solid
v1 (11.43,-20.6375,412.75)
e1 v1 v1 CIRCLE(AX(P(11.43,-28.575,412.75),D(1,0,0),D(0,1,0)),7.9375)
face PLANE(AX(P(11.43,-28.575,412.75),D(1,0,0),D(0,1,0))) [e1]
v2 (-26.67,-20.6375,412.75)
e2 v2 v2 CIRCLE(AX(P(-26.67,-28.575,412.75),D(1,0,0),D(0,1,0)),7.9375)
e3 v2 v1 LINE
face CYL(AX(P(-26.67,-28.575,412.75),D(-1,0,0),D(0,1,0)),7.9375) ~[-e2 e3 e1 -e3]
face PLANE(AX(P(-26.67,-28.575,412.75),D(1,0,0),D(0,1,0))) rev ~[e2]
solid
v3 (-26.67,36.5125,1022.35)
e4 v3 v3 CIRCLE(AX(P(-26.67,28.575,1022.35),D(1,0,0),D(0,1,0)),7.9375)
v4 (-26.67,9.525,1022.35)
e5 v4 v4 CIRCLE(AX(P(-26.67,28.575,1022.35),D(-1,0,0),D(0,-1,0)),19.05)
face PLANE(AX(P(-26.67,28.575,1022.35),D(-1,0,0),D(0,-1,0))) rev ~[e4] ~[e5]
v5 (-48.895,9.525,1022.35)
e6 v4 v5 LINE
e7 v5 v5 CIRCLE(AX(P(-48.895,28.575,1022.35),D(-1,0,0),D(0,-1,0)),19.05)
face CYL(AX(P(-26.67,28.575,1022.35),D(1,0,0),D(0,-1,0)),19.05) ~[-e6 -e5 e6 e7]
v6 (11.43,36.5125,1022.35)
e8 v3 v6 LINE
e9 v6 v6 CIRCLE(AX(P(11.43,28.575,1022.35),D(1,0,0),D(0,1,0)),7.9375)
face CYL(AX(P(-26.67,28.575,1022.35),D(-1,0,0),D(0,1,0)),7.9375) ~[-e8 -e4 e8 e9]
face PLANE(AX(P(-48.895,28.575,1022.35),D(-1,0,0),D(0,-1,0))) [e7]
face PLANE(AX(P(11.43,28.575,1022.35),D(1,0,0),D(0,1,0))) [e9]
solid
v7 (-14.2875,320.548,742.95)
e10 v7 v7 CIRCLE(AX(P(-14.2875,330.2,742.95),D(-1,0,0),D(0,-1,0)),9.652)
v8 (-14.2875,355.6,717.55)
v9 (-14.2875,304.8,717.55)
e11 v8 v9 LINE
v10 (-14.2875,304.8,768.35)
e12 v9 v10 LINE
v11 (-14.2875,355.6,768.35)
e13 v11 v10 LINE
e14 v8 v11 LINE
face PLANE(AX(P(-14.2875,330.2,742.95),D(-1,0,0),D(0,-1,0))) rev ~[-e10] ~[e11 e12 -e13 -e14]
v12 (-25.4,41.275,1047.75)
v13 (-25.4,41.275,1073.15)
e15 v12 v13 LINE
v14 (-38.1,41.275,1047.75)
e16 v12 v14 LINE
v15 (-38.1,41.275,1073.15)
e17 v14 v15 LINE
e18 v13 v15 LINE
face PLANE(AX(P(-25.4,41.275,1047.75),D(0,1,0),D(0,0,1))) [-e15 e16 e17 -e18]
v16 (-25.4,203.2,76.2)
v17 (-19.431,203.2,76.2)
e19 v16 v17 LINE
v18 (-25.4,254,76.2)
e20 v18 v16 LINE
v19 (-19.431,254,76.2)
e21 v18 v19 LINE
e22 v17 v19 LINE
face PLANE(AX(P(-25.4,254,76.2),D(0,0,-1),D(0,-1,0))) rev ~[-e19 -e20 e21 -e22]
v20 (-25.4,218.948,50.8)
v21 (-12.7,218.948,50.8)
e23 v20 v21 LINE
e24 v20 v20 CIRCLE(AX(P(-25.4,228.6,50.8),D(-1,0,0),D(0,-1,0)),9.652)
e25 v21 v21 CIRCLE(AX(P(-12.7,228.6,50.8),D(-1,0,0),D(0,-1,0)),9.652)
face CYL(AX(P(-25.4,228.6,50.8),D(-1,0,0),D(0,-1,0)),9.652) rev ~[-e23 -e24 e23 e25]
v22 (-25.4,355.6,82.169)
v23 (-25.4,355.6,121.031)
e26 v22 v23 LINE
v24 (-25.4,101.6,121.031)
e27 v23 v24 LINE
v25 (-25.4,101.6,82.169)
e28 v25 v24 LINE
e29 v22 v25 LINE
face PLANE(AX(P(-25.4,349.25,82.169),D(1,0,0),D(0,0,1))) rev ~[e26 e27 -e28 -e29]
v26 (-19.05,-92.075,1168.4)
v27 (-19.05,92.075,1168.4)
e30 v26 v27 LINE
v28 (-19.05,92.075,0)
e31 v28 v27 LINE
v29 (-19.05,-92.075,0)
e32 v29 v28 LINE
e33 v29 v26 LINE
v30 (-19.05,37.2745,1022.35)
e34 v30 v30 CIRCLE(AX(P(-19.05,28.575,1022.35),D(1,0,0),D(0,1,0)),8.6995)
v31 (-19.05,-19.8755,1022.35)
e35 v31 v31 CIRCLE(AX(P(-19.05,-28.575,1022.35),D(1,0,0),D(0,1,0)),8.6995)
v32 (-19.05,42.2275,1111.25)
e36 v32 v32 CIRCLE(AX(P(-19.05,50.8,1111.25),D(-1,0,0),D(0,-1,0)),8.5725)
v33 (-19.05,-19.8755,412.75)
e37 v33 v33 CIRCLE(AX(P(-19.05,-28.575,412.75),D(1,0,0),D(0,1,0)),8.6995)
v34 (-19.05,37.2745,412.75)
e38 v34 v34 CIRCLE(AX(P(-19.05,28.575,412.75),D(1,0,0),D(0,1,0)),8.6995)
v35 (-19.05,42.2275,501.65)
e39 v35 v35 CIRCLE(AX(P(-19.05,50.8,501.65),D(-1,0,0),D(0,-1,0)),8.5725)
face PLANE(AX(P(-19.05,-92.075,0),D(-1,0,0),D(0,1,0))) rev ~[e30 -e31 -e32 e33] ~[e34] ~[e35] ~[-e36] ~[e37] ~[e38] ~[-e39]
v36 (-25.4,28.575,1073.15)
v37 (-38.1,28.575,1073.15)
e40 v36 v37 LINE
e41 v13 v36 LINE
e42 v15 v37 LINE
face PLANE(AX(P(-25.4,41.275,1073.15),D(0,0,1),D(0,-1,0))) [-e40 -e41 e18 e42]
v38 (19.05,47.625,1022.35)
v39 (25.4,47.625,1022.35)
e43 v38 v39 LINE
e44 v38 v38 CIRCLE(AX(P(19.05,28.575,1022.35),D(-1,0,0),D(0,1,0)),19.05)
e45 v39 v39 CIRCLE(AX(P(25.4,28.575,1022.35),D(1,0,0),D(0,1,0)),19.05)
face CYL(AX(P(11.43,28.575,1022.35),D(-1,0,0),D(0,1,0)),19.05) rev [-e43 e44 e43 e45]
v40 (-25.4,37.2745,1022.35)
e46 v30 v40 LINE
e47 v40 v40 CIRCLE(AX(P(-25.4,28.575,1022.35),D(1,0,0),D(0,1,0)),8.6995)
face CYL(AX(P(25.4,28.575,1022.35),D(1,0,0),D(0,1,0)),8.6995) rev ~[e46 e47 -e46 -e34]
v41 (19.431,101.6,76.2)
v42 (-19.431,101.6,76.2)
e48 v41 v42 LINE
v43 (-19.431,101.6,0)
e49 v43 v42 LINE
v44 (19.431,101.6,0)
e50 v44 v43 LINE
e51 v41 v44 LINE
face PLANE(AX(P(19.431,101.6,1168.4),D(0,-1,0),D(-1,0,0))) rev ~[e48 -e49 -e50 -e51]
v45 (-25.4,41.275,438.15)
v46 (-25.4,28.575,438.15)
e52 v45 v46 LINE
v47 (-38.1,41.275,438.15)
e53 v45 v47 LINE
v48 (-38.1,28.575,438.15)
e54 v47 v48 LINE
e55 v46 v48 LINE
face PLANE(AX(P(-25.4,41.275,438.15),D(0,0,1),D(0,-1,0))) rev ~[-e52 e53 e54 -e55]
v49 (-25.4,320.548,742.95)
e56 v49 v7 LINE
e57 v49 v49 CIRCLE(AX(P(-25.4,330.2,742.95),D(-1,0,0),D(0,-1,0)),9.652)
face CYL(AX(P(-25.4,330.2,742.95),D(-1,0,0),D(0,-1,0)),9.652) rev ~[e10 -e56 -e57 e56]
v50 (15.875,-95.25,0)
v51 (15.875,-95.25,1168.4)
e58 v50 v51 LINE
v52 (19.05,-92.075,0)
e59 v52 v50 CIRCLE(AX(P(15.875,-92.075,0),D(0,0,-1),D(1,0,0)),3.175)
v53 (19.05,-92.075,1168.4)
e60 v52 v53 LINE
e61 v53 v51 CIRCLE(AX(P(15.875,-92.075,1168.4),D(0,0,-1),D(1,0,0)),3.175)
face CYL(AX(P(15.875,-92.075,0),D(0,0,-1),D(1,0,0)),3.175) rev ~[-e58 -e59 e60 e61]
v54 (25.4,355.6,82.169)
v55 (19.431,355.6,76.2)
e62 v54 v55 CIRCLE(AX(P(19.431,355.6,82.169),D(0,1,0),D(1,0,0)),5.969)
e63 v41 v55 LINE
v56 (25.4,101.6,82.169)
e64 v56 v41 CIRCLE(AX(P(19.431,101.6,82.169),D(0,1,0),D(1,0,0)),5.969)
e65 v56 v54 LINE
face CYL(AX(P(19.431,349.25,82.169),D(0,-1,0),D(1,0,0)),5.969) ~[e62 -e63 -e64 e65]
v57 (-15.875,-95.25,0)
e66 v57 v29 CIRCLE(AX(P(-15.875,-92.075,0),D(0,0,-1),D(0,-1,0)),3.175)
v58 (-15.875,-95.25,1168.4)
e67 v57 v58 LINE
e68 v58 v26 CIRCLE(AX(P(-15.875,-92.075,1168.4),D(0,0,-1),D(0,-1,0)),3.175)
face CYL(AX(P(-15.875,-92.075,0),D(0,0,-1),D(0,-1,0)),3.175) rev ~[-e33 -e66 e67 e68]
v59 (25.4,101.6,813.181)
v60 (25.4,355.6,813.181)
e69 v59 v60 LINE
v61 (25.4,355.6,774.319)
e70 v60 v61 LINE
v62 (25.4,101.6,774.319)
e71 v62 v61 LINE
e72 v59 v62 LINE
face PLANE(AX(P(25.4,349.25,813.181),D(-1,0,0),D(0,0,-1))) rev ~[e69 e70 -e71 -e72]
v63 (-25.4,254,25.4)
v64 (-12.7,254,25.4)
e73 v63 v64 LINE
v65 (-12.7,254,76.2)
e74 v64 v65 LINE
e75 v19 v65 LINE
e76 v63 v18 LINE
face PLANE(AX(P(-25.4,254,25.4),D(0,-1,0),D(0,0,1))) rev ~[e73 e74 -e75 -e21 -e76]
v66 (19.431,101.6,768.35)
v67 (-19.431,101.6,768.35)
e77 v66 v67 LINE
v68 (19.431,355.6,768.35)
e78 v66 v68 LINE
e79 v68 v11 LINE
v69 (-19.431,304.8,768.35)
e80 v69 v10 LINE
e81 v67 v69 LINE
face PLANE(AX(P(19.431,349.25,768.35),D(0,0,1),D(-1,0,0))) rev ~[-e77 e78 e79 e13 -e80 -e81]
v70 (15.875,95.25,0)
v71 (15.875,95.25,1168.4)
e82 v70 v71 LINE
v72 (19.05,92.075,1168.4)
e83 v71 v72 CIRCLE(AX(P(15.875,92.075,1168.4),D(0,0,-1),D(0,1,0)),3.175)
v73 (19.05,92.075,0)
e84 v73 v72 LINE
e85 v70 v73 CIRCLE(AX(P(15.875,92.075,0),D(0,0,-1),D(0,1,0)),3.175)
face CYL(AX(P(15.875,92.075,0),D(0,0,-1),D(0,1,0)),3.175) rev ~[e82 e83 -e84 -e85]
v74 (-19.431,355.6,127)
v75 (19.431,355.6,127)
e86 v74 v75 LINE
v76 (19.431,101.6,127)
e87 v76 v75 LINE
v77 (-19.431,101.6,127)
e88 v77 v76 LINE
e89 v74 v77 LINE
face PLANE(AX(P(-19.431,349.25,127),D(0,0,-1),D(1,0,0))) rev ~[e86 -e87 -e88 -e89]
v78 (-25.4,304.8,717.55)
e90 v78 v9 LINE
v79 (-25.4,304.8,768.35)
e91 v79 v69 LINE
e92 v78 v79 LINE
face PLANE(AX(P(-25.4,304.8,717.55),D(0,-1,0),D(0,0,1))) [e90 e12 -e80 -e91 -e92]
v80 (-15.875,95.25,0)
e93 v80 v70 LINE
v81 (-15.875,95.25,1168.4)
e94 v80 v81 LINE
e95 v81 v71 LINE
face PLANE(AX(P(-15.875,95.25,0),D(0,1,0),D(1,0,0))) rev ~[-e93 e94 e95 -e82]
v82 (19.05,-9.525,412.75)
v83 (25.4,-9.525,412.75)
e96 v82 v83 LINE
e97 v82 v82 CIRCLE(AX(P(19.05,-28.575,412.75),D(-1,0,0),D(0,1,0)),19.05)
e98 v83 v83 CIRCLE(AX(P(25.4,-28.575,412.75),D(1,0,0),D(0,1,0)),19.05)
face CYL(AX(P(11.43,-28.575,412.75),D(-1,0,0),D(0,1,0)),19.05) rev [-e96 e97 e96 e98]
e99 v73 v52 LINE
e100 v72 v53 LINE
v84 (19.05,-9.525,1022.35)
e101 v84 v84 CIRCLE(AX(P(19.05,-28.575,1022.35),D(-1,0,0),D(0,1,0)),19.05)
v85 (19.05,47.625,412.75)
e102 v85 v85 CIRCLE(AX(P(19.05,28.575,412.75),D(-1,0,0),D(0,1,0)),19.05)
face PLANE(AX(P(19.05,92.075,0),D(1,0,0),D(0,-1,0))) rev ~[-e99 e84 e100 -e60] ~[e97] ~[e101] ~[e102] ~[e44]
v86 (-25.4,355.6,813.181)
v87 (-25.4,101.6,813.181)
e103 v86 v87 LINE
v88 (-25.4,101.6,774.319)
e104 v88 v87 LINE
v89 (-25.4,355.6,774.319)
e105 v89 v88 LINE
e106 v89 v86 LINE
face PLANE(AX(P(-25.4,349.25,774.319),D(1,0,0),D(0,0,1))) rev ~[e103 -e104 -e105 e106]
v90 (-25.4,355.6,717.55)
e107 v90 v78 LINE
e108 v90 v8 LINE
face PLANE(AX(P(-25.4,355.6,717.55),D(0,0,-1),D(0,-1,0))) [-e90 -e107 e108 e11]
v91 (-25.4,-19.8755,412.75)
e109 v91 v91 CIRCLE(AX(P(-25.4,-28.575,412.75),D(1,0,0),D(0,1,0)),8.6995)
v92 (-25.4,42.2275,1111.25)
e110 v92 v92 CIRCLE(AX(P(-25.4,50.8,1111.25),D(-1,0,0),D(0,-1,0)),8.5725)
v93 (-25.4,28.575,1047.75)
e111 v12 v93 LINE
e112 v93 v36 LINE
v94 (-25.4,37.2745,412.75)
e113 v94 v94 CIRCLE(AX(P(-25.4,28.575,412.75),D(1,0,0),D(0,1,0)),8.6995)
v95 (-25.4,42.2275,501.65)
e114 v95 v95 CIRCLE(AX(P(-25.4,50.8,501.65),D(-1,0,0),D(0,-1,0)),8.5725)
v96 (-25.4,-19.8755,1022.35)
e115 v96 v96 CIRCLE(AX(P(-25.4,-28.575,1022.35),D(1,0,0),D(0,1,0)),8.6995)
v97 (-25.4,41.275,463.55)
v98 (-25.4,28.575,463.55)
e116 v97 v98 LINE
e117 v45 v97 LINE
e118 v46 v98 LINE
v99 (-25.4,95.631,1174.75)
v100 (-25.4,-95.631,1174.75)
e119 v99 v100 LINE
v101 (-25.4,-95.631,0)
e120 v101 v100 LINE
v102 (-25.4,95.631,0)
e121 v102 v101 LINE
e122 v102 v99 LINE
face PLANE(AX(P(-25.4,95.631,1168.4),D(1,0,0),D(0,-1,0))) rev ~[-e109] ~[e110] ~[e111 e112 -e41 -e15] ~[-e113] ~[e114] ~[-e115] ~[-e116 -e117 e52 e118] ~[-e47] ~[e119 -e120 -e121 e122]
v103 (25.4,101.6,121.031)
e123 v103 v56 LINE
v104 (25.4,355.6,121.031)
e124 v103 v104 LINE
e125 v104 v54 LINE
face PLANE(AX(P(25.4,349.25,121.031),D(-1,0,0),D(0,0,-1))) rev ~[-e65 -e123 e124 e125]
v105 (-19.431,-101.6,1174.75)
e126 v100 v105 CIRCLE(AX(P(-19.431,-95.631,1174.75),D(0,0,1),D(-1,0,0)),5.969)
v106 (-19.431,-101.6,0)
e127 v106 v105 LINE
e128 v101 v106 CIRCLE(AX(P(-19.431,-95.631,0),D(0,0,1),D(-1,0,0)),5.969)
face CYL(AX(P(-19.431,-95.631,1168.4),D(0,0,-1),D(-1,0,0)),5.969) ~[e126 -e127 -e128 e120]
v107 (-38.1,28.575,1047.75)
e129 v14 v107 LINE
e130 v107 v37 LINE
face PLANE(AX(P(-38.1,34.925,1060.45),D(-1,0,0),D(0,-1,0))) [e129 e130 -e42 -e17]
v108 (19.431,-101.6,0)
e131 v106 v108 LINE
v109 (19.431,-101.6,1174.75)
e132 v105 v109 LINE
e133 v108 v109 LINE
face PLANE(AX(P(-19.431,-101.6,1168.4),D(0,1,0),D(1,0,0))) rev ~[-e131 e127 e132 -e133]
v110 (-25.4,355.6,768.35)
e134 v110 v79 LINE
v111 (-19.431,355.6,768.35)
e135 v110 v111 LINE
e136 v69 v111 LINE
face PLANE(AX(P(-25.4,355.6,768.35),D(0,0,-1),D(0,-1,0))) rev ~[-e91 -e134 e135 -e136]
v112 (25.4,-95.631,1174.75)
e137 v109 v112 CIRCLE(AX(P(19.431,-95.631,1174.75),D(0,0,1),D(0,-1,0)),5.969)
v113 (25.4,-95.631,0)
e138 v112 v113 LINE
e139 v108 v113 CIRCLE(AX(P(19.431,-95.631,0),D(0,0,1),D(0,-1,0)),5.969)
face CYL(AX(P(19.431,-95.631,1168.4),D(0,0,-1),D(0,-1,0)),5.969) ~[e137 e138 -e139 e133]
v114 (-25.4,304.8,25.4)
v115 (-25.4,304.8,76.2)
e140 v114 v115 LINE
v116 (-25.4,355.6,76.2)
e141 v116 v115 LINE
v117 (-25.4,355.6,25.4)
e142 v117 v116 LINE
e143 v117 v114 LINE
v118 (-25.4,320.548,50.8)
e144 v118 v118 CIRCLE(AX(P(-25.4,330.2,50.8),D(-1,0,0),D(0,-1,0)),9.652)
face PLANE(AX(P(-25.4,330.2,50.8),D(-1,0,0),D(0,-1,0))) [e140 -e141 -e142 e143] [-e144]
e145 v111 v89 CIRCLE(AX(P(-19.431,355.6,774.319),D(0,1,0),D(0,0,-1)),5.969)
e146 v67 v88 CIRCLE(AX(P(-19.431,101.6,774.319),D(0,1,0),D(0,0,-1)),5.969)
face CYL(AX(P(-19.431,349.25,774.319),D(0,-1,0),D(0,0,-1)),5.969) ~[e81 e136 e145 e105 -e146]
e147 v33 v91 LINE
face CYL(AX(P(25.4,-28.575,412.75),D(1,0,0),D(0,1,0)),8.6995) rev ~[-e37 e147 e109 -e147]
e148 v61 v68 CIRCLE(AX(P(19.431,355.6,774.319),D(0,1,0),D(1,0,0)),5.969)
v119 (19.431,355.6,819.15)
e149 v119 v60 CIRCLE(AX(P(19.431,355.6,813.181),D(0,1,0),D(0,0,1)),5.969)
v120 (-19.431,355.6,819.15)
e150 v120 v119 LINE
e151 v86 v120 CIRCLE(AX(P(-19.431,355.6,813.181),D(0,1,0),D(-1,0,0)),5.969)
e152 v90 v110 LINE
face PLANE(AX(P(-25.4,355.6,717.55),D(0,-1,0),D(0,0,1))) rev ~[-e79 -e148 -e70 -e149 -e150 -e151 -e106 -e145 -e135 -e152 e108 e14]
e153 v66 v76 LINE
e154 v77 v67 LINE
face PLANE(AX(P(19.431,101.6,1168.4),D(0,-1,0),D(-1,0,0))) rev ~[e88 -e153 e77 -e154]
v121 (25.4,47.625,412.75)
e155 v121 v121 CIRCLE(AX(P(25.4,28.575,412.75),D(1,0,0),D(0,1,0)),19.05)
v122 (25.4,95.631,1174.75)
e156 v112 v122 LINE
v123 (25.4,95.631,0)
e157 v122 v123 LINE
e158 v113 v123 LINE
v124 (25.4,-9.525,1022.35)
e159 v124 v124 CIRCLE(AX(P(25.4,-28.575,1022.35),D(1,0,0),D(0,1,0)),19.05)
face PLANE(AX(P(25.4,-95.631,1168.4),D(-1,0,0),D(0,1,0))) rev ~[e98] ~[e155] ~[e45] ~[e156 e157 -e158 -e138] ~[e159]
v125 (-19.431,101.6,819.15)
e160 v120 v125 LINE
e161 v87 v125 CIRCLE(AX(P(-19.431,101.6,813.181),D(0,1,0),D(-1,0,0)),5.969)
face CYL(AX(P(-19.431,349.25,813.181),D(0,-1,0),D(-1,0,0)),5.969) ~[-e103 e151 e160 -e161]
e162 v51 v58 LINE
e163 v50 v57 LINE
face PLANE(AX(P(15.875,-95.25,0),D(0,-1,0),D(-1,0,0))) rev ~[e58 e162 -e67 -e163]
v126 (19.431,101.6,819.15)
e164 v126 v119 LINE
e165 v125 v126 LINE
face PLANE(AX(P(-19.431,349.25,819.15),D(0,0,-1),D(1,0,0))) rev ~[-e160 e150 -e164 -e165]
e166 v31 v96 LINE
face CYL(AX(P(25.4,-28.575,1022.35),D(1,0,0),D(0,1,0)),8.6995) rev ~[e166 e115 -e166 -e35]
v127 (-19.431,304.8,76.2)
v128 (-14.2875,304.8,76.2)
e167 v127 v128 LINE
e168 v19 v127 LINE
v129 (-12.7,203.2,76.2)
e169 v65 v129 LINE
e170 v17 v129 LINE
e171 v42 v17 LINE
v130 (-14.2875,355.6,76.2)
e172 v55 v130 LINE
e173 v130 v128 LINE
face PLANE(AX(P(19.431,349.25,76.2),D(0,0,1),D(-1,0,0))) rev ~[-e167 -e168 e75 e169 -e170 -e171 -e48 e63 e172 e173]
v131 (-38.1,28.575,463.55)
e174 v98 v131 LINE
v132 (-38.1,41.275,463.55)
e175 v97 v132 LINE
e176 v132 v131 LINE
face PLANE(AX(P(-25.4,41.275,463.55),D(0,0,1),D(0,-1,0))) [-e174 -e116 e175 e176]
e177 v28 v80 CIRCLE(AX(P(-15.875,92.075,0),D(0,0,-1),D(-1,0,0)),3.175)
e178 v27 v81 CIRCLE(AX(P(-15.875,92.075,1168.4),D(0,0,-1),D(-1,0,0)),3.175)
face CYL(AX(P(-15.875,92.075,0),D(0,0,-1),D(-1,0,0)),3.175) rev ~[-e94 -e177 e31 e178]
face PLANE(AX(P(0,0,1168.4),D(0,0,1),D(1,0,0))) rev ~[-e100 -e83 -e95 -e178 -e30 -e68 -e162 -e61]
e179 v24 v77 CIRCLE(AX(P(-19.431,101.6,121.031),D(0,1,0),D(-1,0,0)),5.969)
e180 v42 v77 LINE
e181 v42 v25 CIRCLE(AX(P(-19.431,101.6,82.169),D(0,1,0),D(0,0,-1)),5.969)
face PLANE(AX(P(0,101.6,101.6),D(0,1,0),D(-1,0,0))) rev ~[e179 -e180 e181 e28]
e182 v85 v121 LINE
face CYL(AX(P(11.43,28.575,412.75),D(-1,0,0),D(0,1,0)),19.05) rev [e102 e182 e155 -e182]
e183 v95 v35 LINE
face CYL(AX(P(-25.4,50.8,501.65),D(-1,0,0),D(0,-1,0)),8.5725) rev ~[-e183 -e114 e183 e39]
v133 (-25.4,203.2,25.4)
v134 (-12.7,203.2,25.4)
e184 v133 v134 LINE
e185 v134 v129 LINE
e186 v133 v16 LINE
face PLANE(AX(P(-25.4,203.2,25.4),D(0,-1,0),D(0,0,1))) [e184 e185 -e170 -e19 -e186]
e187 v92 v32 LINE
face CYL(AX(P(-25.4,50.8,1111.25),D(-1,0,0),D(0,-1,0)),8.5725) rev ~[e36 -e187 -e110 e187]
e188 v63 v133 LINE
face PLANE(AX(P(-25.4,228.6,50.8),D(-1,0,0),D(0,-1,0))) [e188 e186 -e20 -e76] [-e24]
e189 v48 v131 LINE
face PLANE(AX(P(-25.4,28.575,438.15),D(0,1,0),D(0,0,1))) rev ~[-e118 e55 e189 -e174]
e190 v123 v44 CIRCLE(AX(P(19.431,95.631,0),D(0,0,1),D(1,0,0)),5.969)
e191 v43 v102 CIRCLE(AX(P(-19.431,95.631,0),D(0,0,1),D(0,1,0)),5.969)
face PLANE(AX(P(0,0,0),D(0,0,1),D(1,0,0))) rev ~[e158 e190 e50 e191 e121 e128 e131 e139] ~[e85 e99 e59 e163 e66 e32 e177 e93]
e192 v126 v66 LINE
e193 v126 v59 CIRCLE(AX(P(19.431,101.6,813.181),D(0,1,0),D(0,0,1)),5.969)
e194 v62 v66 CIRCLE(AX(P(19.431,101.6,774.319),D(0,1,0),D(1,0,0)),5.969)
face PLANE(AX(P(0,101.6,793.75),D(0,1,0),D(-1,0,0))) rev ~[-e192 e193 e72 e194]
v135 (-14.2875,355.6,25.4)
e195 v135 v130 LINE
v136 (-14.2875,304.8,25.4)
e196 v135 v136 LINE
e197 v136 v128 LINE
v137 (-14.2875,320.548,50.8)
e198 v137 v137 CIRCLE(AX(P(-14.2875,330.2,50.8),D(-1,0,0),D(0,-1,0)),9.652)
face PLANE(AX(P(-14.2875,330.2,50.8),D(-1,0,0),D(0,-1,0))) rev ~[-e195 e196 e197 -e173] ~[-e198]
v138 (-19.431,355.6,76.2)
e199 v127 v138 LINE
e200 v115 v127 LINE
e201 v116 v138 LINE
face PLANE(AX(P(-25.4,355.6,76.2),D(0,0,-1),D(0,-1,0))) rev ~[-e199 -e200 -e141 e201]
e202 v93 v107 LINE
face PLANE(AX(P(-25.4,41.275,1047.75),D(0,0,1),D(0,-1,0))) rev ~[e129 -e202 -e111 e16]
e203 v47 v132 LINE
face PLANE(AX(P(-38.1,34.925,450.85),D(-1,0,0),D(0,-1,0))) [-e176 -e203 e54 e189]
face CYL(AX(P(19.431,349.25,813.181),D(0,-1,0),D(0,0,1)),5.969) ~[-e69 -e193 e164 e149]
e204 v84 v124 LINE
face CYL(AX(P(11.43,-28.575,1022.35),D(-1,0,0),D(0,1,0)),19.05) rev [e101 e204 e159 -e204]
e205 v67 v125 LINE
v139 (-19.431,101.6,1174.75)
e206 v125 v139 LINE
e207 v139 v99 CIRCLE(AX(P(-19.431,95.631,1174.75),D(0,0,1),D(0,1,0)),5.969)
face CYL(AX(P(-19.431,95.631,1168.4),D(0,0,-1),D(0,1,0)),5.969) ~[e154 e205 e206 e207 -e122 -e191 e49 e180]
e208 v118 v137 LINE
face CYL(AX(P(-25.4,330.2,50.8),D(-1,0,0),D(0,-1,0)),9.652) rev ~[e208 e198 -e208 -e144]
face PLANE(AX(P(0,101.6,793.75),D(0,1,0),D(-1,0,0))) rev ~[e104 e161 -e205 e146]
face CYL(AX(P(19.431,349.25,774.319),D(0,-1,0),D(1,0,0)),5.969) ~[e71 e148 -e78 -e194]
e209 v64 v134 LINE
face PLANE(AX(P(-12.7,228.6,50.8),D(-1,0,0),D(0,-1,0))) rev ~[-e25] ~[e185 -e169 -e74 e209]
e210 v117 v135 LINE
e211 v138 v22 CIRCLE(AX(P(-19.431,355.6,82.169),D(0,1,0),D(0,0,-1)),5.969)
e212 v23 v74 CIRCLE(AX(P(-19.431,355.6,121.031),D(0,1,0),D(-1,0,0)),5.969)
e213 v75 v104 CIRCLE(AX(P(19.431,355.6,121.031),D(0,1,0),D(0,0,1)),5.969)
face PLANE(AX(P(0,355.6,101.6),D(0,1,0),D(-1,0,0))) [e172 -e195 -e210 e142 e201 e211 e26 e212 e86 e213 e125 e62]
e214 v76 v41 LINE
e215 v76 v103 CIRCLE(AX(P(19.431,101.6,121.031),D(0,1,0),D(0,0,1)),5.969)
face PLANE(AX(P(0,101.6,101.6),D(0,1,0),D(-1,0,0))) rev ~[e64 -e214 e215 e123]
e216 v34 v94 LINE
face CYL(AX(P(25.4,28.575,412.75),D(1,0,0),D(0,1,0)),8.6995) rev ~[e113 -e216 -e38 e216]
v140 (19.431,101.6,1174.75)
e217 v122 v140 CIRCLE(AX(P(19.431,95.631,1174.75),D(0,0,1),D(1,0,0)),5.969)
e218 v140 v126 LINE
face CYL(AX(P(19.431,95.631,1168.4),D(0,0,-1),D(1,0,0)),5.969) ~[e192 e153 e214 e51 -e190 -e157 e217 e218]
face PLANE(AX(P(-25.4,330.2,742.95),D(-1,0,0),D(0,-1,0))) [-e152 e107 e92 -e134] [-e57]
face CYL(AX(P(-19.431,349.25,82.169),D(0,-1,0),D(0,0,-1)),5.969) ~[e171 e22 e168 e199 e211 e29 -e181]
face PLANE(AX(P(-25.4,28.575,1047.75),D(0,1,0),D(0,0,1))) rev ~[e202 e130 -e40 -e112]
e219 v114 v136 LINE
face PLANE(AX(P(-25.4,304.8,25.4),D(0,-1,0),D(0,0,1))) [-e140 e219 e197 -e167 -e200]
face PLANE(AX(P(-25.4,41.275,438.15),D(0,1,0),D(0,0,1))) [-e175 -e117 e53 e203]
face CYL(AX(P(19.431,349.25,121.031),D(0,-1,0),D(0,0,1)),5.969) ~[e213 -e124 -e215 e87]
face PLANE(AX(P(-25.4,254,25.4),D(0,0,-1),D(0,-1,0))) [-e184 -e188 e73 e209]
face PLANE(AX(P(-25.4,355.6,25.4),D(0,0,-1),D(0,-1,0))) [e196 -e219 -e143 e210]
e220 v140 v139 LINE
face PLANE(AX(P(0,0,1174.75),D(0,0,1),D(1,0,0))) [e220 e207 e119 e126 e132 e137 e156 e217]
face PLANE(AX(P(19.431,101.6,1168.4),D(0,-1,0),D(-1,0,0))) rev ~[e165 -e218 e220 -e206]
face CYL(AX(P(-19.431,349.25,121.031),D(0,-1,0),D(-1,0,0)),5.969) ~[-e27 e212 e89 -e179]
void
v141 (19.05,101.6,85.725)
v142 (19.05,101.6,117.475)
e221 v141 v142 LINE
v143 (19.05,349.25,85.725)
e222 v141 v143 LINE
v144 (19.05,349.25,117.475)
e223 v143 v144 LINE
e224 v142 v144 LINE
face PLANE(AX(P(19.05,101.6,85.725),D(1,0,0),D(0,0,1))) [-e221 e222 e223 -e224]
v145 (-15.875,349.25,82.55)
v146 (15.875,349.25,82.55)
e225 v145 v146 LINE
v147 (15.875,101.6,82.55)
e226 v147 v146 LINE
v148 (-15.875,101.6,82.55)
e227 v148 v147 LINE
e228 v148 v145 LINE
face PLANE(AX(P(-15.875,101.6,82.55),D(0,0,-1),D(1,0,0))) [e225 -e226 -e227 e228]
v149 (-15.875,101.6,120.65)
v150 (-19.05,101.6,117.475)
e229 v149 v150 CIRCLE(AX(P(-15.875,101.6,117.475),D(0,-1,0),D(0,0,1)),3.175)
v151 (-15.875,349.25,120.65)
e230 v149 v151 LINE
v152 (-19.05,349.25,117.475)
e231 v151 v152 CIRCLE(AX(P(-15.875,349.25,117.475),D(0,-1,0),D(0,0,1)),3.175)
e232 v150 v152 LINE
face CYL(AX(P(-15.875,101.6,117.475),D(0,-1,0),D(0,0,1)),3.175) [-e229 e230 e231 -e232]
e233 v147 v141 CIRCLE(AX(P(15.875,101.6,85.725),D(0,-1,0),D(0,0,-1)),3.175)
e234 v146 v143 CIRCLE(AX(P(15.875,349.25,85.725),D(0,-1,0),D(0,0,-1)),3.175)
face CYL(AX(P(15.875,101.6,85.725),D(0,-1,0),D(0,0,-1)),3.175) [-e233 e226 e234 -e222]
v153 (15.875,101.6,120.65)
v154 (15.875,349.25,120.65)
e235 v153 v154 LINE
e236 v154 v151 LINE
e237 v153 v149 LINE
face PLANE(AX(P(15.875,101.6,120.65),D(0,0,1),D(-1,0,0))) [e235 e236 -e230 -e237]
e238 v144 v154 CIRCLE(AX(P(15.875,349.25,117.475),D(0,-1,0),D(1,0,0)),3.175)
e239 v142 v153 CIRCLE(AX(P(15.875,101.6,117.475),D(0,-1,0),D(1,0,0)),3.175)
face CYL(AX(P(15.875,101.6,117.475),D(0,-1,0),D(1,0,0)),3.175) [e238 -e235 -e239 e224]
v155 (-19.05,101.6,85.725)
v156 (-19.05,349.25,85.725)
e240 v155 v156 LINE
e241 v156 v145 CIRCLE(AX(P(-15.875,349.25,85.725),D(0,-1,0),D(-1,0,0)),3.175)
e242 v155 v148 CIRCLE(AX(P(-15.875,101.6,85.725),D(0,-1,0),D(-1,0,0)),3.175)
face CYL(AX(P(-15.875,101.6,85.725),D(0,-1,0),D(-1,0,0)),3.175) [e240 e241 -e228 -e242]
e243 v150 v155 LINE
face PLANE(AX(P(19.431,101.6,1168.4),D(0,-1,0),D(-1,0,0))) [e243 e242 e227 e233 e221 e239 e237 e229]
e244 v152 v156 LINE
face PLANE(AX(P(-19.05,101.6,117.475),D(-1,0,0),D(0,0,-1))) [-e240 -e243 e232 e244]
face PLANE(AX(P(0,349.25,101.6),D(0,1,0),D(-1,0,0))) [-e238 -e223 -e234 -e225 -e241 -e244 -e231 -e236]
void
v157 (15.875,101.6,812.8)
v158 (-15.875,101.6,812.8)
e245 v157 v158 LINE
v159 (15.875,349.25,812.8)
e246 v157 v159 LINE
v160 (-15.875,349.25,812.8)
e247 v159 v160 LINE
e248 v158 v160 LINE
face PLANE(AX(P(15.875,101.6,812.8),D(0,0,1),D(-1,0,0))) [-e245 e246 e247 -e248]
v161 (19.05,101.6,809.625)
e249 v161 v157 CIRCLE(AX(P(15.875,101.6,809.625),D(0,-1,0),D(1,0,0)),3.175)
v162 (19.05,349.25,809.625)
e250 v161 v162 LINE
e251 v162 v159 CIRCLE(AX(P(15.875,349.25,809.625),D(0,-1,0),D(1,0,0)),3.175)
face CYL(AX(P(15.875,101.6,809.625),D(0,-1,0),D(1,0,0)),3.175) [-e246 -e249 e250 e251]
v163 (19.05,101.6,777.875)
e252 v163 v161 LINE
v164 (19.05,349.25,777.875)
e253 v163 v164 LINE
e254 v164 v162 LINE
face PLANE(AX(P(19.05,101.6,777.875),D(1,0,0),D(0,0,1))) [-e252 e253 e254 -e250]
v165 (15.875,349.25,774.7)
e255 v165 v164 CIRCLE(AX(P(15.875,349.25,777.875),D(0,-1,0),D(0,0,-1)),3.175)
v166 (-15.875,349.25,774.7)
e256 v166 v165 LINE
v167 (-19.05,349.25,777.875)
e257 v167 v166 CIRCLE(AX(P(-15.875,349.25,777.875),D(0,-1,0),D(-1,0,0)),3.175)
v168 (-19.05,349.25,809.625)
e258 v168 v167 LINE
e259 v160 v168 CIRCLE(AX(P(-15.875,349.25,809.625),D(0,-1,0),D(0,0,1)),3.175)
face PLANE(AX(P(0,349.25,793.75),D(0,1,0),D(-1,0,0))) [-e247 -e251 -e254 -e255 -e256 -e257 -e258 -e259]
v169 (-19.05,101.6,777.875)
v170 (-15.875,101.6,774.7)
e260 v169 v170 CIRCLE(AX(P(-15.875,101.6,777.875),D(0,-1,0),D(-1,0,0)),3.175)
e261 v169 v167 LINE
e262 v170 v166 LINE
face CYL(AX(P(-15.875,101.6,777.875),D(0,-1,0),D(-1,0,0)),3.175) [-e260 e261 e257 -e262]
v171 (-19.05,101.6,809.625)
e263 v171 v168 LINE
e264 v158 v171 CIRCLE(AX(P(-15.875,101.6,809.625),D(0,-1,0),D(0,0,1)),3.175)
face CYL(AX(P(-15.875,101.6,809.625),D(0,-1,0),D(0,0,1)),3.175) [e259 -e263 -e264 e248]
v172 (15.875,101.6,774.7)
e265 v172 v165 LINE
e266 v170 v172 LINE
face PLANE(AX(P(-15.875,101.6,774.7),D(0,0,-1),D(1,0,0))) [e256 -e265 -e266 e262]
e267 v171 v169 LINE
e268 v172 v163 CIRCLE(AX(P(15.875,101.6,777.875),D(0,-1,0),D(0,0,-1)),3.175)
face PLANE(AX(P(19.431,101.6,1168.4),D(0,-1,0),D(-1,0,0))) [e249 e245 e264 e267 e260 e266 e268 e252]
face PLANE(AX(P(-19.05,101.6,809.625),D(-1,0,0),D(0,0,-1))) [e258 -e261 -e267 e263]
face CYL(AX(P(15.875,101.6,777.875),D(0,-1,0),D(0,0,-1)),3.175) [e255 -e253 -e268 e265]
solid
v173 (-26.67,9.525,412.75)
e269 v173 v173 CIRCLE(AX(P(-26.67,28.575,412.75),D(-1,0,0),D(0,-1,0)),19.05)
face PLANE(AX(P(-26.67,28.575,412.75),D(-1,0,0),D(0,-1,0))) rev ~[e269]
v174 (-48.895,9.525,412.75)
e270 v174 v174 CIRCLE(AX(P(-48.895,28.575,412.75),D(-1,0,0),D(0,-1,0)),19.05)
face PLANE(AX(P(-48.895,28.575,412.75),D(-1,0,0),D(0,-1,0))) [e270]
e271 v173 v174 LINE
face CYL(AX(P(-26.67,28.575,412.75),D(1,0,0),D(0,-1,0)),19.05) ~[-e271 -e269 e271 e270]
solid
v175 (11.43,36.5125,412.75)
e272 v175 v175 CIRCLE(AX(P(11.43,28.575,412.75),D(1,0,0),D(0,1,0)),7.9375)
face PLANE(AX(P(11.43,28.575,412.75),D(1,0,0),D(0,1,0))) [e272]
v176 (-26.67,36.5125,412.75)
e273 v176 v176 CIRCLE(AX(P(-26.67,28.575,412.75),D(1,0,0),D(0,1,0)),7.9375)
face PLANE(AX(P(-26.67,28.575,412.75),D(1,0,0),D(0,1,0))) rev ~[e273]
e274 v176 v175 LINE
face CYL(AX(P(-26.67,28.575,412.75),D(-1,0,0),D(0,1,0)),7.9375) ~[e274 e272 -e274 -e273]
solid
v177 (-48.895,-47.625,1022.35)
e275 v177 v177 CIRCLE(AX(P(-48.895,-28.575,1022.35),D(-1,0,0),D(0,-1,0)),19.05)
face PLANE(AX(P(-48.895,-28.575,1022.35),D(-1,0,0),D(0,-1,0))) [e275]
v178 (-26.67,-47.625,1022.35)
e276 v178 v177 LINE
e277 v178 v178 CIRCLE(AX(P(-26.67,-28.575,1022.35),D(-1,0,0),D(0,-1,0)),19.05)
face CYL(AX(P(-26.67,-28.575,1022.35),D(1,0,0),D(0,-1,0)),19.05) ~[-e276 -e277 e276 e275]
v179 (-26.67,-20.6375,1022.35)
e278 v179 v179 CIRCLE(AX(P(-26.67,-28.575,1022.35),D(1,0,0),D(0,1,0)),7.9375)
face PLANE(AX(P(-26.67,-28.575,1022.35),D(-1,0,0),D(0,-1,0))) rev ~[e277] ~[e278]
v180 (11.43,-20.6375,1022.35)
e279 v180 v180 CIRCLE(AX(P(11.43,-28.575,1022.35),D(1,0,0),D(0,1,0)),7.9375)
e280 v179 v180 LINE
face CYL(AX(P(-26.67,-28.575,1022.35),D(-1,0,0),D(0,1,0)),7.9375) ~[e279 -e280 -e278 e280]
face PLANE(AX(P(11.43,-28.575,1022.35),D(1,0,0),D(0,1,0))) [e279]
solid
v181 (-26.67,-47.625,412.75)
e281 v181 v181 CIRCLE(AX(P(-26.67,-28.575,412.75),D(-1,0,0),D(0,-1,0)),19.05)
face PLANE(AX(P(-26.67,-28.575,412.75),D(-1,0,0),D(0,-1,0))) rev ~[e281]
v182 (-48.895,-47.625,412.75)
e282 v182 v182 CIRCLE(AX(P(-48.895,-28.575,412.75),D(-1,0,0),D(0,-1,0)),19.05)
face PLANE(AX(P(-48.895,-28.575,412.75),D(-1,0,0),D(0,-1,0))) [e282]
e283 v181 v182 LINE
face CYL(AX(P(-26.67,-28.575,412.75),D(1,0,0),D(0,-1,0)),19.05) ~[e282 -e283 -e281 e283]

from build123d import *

# Parameters (mm, degrees)
F1_DEPTH  = 1168.4
F3_DEPTH  = 6.35
F5_START  = 1.27
F4_R      = 19.05
F5_DEPTH  = 22.225
F6_R      = 7.9375
F7_DEPTH  = 38.1
F8_R      = 7.9375
F9_DEPTH  = 38.1
F10_R     = 19.05
F11_DEPTH = 13.97
F12_W     = 12.7
F12_H     = 25.4
F13_DEPTH = 12.7
F14_R     = 8.6995
F15_DEPTH = 74.296
F17_DEPTH = 247.65
F19_DEPTH = 6.35
F21_DEPTH = 6.35
F22_W     = 50.8
F22_H     = 50.8
F22_R     = 9.652
F23_DEPTH = 11.1125
F24_R     = 8.5725
F25_DEPTH = 25.4
F26_W     = 50.8
F26_H     = 50.8
F26_R     = 9.652
F27_DEPTH = 12.7


with BuildPart() as f1:
    # F0 (on Top) → F1 (new body)
    with BuildSketch(Plane.XY):
        with BuildLine():
            Line((-19.431, -101.6), (19.431, -101.6))
            ThreePointArc((19.431, -101.6), (23.6517203769, -99.8517203769), (25.4, -95.631))
            Line((25.4, -95.631), (25.4, 95.631))
            ThreePointArc((25.4, 95.631), (23.6517203769, 99.8517203769), (19.431, 101.6))
            Line((19.431, 101.6), (-19.431, 101.6))
            ThreePointArc((-19.431, 101.6), (-23.6517203769, 99.8517203769), (-25.4, 95.631))
            Line((-25.4, 95.631), (-25.4, -95.631))
            ThreePointArc((-25.4, -95.631), (-23.6517203769, -99.8517203769), (-19.431, -101.6))
        make_face()
        with BuildLine():
            ThreePointArc((-15.875, -95.25), (-18.1200640303, -94.3200640303), (-19.05, -92.075))
            Line((-19.05, -92.075), (-19.05, 92.075))
            ThreePointArc((-19.05, 92.075), (-18.1200640303, 94.3200640303), (-15.875, 95.25))
            Line((-15.875, 95.25), (15.875, 95.25))
            ThreePointArc((15.875, 95.25), (18.1200640303, 94.3200640303), (19.05, 92.075))
            Line((19.05, 92.075), (19.05, -92.075))
            ThreePointArc((19.05, -92.075), (18.1200640303, -94.3200640303), (15.875, -95.25))
            Line((15.875, -95.25), (-15.875, -95.25))
        make_face(mode=Mode.SUBTRACT)
    extrude(amount=F1_DEPTH)

    # F2 (on face) → F3 (join)
    with BuildSketch(Plane.XY.offset(1168.4)):
        with BuildLine():
            Line((19.431, 101.6), (-19.431, 101.6))
            ThreePointArc((-19.431, 101.6), (-23.6517203769, 99.8517203769), (-25.4, 95.631))
            Line((-25.4, 95.631), (-25.4, -95.631))
            ThreePointArc((-25.4, -95.631), (-23.6517203769, -99.8517203769), (-19.431, -101.6))
            Line((-19.431, -101.6), (19.431, -101.6))
            ThreePointArc((19.431, -101.6), (23.6517203769, -99.8517203769), (25.4, -95.631))
            Line((25.4, -95.631), (25.4, 95.631))
            ThreePointArc((25.4, 95.631), (23.6517203769, 99.8517203769), (19.431, 101.6))
        make_face()
    extrude(amount=F3_DEPTH)

    # F10 (on face) → F11 (cut, through all)
    with BuildSketch(Plane.YZ.offset(11.43)):
        with Locations((-28.575, 1022.35)):
            Circle(F10_R)
        with Locations((28.575, 1022.35)):
            Circle(F10_R)
        with Locations((-28.575, 412.75)):
            Circle(F10_R)
        with Locations((28.575, 412.75)):
            Circle(F10_R)
    extrude(amount=F11_DEPTH, mode=Mode.SUBTRACT)

    # F12 (on face) → F13 (join)
    with BuildSketch(Plane(origin=(-25.4, 0, 0), x_dir=(0, -1, 0), z_dir=(-1, 0, 0))):
        with Locations((-34.925, 1060.45)):
            Rectangle(F12_W, F12_H)
        with Locations((-34.925, 450.85)):
            Rectangle(F12_W, F12_H)
    extrude(amount=F13_DEPTH)

    # F14 (on face) → F15 (cut, through all)
    with BuildSketch(Plane.YZ.offset(25.4)):
        with Locations((-28.575, 1022.35)):
            Circle(F14_R)
        with Locations((28.575, 1022.35)):
            Circle(F14_R)
        with Locations((28.575, 412.75)):
            Circle(F14_R)
        with Locations((-28.575, 412.75)):
            Circle(F14_R)
    extrude(amount=-F15_DEPTH, mode=Mode.SUBTRACT)

    # F16 (on face) → F17 (join)
    with BuildSketch(Plane(origin=(0, 101.6, 0), x_dir=(-1, 0, 0), z_dir=(0, 1, 0))):
        with BuildLine():
            Line((19.431, 819.15), (-19.431, 819.15))
            ThreePointArc((-19.431, 819.15), (-23.6517203769, 817.4017203769), (-25.4, 813.181))
            Line((-25.4, 813.181), (-25.4, 774.319))
            ThreePointArc((-25.4, 774.319), (-23.6517203769, 770.0982796231), (-19.431, 768.35))
            Line((-19.431, 768.35), (19.431, 768.35))
            ThreePointArc((19.431, 768.35), (23.6517203769, 770.0982796231), (25.4, 774.319))
            Line((25.4, 774.319), (25.4, 813.181))
            ThreePointArc((25.4, 813.181), (23.6517203769, 817.4017203769), (19.431, 819.15))
        make_face()
        with BuildLine():
            ThreePointArc((-19.05, 809.625), (-18.1200640303, 811.8700640303), (-15.875, 812.8))
            Line((-15.875, 812.8), (15.875, 812.8))
            ThreePointArc((15.875, 812.8), (18.1200640303, 811.8700640303), (19.05, 809.625))
            Line((19.05, 809.625), (19.05, 777.875))
            ThreePointArc((19.05, 777.875), (18.1200640303, 775.6299359697), (15.875, 774.7))
            Line((15.875, 774.7), (-15.875, 774.7))
            ThreePointArc((-15.875, 774.7), (-18.1200640303, 775.6299359697), (-19.05, 777.875))
            Line((-19.05, 777.875), (-19.05, 809.625))
        make_face(mode=Mode.SUBTRACT)
        with BuildLine():
            ThreePointArc((-19.431, 127), (-23.6517203769, 125.2517203769), (-25.4, 121.031))
            Line((-25.4, 121.031), (-25.4, 82.169))
            ThreePointArc((-25.4, 82.169), (-23.6517203769, 77.9482796231), (-19.431, 76.2))
            Line((-19.431, 76.2), (19.431, 76.2))
            ThreePointArc((19.431, 76.2), (23.6517203769, 77.9482796231), (25.4, 82.169))
            Line((25.4, 82.169), (25.4, 121.031))
            ThreePointArc((25.4, 121.031), (23.6517203769, 125.2517203769), (19.431, 127))
            Line((19.431, 127), (-19.431, 127))
        make_face()
        with BuildLine():
            Line((-19.05, 85.725), (-19.05, 117.475))
            ThreePointArc((-19.05, 117.475), (-18.1200640303, 119.7200640303), (-15.875, 120.65))
            Line((-15.875, 120.65), (15.875, 120.65))
            ThreePointArc((15.875, 120.65), (18.1200640303, 119.7200640303), (19.05, 117.475))
            Line((19.05, 117.475), (19.05, 85.725))
            ThreePointArc((19.05, 85.725), (18.1200640303, 83.4799359697), (15.875, 82.55))
            Line((15.875, 82.55), (-15.875, 82.55))
            ThreePointArc((-15.875, 82.55), (-18.1200640303, 83.4799359697), (-19.05, 85.725))
        make_face(mode=Mode.SUBTRACT)
    extrude(amount=F17_DEPTH)

    # F18 (on face) → F19 (join)
    with BuildSketch(Plane(origin=(0, 349.25, 0), x_dir=(-1, 0, 0), z_dir=(0, 1, 0))):
        with BuildLine():
            Line((19.431, 819.15), (-19.431, 819.15))
            ThreePointArc((-19.431, 819.15), (-23.6517203769, 817.4017203769), (-25.4, 813.181))
            Line((-25.4, 813.181), (-25.4, 774.319))
            ThreePointArc((-25.4, 774.319), (-23.6517203769, 770.0982796231), (-19.431, 768.35))
            Line((-19.431, 768.35), (19.431, 768.35))
            ThreePointArc((19.431, 768.35), (23.6517203769, 770.0982796231), (25.4, 774.319))
            Line((25.4, 774.319), (25.4, 813.181))
            ThreePointArc((25.4, 813.181), (23.6517203769, 817.4017203769), (19.431, 819.15))
        make_face()
    extrude(amount=F19_DEPTH)

    # F20 (on face) → F21 (join)
    with BuildSketch(Plane(origin=(0, 349.25, 0), x_dir=(-1, 0, 0), z_dir=(0, 1, 0))):
        with BuildLine():
            Line((19.431, 127), (-19.431, 127))
            ThreePointArc((-19.431, 127), (-23.6517203769, 125.2517203769), (-25.4, 121.031))
            Line((-25.4, 121.031), (-25.4, 82.169))
            ThreePointArc((-25.4, 82.169), (-23.6517203769, 77.9482796231), (-19.431, 76.2))
            Line((-19.431, 76.2), (19.431, 76.2))
            ThreePointArc((19.431, 76.2), (23.6517203769, 77.9482796231), (25.4, 82.169))
            Line((25.4, 82.169), (25.4, 121.031))
            ThreePointArc((25.4, 121.031), (23.6517203769, 125.2517203769), (19.431, 127))
        make_face()
    extrude(amount=F21_DEPTH)

    # F22 (on face) → F23 (join)
    with BuildSketch(Plane(origin=(-25.4, 0, 0), x_dir=(0, -1, 0), z_dir=(-1, 0, 0))):
        with Locations((-330.2, 742.95)):
            Rectangle(F22_W, F22_H)
        with Locations((-330.2, 742.95)):
            Circle(F22_R, mode=Mode.SUBTRACT)
        with Locations((-330.2, 50.8)):
            Rectangle(F22_W, F22_H)
        with Locations((-330.2, 50.8)):
            Circle(F22_R, mode=Mode.SUBTRACT)
    extrude(amount=-F23_DEPTH)

    # F24 (on face) → F25 (cut)
    with BuildSketch(Plane(origin=(-25.4, 0, 0), x_dir=(0, -1, 0), z_dir=(-1, 0, 0))):
        with Locations((-50.8, 1111.25)):
            Circle(F24_R)
        with Locations((-50.8, 501.65)):
            Circle(F24_R)
    extrude(amount=-F25_DEPTH, mode=Mode.SUBTRACT)

    # F26 (on face) → F27 (join)
    with BuildSketch(Plane(origin=(-25.4, 0, 0), x_dir=(0, -1, 0), z_dir=(-1, 0, 0))):
        with Locations((-228.6, 50.8)):
            Rectangle(F26_W, F26_H)
        with Locations((-228.6, 50.8)):
            Circle(F26_R, mode=Mode.SUBTRACT)
    extrude(amount=-F27_DEPTH)


with BuildPart() as f5:
    # F4 (on face) → F5 (new body)
    with BuildSketch(Plane(origin=(-25.4, 0, 0), x_dir=(0, -1, 0), z_dir=(-1, 0, 0)).offset(F5_START)):
        with Locations((28.575, 1022.35)):
            Circle(F4_R)
    extrude(amount=F5_DEPTH)

    # F6 (on face) → F7 (join)
    with BuildSketch(Plane.YZ.offset(-26.67)):
        with Locations((-28.575, 1022.35)):
            Circle(F6_R)
    extrude(amount=F7_DEPTH)


with BuildPart() as f5b:
    # F4 (on face) → F5, piece 2 (new body)
    with BuildSketch(Plane(origin=(-25.4, 0, 0), x_dir=(0, -1, 0), z_dir=(-1, 0, 0)).offset(F5_START)):
        with Locations((-28.575, 1022.35)):
            Circle(F4_R)
    extrude(amount=F5_DEPTH)

    # F8 (on face) → F9 (join)
    with BuildSketch(Plane.YZ.offset(-26.67)):
        with Locations((28.575, 1022.35)):
            Circle(F8_R)
    extrude(amount=F9_DEPTH)


with BuildPart() as f5c:
    # F4 (on face) → F5, piece 3 (new body)
    with BuildSketch(Plane(origin=(-25.4, 0, 0), x_dir=(0, -1, 0), z_dir=(-1, 0, 0)).offset(F5_START)):
        with Locations((-28.575, 412.75)):
            Circle(F4_R)
    extrude(amount=F5_DEPTH)


with BuildPart() as f5d:
    # F4 (on face) → F5, piece 4 (new body)
    with BuildSketch(Plane(origin=(-25.4, 0, 0), x_dir=(0, -1, 0), z_dir=(-1, 0, 0)).offset(F5_START)):
        with Locations((28.575, 412.75)):
            Circle(F4_R)
    extrude(amount=F5_DEPTH)


with BuildPart() as f7:
    # F6 (on face) → F7, piece 2 (new body)
    with BuildSketch(Plane.YZ.offset(-26.67)):
        with Locations((-28.575, 412.75)):
            Circle(F6_R)
    extrude(amount=F7_DEPTH)


with BuildPart() as f9:
    # F8 (on face) → F9, piece 2 (new body)
    with BuildSketch(Plane.YZ.offset(-26.67)):
        with Locations((28.575, 412.75)):
            Circle(F8_R)
    extrude(amount=F9_DEPTH)


solid = Compound([f1.part, f5.part, f5b.part, f5c.part, f5d.part, f7.part, f9.part])
